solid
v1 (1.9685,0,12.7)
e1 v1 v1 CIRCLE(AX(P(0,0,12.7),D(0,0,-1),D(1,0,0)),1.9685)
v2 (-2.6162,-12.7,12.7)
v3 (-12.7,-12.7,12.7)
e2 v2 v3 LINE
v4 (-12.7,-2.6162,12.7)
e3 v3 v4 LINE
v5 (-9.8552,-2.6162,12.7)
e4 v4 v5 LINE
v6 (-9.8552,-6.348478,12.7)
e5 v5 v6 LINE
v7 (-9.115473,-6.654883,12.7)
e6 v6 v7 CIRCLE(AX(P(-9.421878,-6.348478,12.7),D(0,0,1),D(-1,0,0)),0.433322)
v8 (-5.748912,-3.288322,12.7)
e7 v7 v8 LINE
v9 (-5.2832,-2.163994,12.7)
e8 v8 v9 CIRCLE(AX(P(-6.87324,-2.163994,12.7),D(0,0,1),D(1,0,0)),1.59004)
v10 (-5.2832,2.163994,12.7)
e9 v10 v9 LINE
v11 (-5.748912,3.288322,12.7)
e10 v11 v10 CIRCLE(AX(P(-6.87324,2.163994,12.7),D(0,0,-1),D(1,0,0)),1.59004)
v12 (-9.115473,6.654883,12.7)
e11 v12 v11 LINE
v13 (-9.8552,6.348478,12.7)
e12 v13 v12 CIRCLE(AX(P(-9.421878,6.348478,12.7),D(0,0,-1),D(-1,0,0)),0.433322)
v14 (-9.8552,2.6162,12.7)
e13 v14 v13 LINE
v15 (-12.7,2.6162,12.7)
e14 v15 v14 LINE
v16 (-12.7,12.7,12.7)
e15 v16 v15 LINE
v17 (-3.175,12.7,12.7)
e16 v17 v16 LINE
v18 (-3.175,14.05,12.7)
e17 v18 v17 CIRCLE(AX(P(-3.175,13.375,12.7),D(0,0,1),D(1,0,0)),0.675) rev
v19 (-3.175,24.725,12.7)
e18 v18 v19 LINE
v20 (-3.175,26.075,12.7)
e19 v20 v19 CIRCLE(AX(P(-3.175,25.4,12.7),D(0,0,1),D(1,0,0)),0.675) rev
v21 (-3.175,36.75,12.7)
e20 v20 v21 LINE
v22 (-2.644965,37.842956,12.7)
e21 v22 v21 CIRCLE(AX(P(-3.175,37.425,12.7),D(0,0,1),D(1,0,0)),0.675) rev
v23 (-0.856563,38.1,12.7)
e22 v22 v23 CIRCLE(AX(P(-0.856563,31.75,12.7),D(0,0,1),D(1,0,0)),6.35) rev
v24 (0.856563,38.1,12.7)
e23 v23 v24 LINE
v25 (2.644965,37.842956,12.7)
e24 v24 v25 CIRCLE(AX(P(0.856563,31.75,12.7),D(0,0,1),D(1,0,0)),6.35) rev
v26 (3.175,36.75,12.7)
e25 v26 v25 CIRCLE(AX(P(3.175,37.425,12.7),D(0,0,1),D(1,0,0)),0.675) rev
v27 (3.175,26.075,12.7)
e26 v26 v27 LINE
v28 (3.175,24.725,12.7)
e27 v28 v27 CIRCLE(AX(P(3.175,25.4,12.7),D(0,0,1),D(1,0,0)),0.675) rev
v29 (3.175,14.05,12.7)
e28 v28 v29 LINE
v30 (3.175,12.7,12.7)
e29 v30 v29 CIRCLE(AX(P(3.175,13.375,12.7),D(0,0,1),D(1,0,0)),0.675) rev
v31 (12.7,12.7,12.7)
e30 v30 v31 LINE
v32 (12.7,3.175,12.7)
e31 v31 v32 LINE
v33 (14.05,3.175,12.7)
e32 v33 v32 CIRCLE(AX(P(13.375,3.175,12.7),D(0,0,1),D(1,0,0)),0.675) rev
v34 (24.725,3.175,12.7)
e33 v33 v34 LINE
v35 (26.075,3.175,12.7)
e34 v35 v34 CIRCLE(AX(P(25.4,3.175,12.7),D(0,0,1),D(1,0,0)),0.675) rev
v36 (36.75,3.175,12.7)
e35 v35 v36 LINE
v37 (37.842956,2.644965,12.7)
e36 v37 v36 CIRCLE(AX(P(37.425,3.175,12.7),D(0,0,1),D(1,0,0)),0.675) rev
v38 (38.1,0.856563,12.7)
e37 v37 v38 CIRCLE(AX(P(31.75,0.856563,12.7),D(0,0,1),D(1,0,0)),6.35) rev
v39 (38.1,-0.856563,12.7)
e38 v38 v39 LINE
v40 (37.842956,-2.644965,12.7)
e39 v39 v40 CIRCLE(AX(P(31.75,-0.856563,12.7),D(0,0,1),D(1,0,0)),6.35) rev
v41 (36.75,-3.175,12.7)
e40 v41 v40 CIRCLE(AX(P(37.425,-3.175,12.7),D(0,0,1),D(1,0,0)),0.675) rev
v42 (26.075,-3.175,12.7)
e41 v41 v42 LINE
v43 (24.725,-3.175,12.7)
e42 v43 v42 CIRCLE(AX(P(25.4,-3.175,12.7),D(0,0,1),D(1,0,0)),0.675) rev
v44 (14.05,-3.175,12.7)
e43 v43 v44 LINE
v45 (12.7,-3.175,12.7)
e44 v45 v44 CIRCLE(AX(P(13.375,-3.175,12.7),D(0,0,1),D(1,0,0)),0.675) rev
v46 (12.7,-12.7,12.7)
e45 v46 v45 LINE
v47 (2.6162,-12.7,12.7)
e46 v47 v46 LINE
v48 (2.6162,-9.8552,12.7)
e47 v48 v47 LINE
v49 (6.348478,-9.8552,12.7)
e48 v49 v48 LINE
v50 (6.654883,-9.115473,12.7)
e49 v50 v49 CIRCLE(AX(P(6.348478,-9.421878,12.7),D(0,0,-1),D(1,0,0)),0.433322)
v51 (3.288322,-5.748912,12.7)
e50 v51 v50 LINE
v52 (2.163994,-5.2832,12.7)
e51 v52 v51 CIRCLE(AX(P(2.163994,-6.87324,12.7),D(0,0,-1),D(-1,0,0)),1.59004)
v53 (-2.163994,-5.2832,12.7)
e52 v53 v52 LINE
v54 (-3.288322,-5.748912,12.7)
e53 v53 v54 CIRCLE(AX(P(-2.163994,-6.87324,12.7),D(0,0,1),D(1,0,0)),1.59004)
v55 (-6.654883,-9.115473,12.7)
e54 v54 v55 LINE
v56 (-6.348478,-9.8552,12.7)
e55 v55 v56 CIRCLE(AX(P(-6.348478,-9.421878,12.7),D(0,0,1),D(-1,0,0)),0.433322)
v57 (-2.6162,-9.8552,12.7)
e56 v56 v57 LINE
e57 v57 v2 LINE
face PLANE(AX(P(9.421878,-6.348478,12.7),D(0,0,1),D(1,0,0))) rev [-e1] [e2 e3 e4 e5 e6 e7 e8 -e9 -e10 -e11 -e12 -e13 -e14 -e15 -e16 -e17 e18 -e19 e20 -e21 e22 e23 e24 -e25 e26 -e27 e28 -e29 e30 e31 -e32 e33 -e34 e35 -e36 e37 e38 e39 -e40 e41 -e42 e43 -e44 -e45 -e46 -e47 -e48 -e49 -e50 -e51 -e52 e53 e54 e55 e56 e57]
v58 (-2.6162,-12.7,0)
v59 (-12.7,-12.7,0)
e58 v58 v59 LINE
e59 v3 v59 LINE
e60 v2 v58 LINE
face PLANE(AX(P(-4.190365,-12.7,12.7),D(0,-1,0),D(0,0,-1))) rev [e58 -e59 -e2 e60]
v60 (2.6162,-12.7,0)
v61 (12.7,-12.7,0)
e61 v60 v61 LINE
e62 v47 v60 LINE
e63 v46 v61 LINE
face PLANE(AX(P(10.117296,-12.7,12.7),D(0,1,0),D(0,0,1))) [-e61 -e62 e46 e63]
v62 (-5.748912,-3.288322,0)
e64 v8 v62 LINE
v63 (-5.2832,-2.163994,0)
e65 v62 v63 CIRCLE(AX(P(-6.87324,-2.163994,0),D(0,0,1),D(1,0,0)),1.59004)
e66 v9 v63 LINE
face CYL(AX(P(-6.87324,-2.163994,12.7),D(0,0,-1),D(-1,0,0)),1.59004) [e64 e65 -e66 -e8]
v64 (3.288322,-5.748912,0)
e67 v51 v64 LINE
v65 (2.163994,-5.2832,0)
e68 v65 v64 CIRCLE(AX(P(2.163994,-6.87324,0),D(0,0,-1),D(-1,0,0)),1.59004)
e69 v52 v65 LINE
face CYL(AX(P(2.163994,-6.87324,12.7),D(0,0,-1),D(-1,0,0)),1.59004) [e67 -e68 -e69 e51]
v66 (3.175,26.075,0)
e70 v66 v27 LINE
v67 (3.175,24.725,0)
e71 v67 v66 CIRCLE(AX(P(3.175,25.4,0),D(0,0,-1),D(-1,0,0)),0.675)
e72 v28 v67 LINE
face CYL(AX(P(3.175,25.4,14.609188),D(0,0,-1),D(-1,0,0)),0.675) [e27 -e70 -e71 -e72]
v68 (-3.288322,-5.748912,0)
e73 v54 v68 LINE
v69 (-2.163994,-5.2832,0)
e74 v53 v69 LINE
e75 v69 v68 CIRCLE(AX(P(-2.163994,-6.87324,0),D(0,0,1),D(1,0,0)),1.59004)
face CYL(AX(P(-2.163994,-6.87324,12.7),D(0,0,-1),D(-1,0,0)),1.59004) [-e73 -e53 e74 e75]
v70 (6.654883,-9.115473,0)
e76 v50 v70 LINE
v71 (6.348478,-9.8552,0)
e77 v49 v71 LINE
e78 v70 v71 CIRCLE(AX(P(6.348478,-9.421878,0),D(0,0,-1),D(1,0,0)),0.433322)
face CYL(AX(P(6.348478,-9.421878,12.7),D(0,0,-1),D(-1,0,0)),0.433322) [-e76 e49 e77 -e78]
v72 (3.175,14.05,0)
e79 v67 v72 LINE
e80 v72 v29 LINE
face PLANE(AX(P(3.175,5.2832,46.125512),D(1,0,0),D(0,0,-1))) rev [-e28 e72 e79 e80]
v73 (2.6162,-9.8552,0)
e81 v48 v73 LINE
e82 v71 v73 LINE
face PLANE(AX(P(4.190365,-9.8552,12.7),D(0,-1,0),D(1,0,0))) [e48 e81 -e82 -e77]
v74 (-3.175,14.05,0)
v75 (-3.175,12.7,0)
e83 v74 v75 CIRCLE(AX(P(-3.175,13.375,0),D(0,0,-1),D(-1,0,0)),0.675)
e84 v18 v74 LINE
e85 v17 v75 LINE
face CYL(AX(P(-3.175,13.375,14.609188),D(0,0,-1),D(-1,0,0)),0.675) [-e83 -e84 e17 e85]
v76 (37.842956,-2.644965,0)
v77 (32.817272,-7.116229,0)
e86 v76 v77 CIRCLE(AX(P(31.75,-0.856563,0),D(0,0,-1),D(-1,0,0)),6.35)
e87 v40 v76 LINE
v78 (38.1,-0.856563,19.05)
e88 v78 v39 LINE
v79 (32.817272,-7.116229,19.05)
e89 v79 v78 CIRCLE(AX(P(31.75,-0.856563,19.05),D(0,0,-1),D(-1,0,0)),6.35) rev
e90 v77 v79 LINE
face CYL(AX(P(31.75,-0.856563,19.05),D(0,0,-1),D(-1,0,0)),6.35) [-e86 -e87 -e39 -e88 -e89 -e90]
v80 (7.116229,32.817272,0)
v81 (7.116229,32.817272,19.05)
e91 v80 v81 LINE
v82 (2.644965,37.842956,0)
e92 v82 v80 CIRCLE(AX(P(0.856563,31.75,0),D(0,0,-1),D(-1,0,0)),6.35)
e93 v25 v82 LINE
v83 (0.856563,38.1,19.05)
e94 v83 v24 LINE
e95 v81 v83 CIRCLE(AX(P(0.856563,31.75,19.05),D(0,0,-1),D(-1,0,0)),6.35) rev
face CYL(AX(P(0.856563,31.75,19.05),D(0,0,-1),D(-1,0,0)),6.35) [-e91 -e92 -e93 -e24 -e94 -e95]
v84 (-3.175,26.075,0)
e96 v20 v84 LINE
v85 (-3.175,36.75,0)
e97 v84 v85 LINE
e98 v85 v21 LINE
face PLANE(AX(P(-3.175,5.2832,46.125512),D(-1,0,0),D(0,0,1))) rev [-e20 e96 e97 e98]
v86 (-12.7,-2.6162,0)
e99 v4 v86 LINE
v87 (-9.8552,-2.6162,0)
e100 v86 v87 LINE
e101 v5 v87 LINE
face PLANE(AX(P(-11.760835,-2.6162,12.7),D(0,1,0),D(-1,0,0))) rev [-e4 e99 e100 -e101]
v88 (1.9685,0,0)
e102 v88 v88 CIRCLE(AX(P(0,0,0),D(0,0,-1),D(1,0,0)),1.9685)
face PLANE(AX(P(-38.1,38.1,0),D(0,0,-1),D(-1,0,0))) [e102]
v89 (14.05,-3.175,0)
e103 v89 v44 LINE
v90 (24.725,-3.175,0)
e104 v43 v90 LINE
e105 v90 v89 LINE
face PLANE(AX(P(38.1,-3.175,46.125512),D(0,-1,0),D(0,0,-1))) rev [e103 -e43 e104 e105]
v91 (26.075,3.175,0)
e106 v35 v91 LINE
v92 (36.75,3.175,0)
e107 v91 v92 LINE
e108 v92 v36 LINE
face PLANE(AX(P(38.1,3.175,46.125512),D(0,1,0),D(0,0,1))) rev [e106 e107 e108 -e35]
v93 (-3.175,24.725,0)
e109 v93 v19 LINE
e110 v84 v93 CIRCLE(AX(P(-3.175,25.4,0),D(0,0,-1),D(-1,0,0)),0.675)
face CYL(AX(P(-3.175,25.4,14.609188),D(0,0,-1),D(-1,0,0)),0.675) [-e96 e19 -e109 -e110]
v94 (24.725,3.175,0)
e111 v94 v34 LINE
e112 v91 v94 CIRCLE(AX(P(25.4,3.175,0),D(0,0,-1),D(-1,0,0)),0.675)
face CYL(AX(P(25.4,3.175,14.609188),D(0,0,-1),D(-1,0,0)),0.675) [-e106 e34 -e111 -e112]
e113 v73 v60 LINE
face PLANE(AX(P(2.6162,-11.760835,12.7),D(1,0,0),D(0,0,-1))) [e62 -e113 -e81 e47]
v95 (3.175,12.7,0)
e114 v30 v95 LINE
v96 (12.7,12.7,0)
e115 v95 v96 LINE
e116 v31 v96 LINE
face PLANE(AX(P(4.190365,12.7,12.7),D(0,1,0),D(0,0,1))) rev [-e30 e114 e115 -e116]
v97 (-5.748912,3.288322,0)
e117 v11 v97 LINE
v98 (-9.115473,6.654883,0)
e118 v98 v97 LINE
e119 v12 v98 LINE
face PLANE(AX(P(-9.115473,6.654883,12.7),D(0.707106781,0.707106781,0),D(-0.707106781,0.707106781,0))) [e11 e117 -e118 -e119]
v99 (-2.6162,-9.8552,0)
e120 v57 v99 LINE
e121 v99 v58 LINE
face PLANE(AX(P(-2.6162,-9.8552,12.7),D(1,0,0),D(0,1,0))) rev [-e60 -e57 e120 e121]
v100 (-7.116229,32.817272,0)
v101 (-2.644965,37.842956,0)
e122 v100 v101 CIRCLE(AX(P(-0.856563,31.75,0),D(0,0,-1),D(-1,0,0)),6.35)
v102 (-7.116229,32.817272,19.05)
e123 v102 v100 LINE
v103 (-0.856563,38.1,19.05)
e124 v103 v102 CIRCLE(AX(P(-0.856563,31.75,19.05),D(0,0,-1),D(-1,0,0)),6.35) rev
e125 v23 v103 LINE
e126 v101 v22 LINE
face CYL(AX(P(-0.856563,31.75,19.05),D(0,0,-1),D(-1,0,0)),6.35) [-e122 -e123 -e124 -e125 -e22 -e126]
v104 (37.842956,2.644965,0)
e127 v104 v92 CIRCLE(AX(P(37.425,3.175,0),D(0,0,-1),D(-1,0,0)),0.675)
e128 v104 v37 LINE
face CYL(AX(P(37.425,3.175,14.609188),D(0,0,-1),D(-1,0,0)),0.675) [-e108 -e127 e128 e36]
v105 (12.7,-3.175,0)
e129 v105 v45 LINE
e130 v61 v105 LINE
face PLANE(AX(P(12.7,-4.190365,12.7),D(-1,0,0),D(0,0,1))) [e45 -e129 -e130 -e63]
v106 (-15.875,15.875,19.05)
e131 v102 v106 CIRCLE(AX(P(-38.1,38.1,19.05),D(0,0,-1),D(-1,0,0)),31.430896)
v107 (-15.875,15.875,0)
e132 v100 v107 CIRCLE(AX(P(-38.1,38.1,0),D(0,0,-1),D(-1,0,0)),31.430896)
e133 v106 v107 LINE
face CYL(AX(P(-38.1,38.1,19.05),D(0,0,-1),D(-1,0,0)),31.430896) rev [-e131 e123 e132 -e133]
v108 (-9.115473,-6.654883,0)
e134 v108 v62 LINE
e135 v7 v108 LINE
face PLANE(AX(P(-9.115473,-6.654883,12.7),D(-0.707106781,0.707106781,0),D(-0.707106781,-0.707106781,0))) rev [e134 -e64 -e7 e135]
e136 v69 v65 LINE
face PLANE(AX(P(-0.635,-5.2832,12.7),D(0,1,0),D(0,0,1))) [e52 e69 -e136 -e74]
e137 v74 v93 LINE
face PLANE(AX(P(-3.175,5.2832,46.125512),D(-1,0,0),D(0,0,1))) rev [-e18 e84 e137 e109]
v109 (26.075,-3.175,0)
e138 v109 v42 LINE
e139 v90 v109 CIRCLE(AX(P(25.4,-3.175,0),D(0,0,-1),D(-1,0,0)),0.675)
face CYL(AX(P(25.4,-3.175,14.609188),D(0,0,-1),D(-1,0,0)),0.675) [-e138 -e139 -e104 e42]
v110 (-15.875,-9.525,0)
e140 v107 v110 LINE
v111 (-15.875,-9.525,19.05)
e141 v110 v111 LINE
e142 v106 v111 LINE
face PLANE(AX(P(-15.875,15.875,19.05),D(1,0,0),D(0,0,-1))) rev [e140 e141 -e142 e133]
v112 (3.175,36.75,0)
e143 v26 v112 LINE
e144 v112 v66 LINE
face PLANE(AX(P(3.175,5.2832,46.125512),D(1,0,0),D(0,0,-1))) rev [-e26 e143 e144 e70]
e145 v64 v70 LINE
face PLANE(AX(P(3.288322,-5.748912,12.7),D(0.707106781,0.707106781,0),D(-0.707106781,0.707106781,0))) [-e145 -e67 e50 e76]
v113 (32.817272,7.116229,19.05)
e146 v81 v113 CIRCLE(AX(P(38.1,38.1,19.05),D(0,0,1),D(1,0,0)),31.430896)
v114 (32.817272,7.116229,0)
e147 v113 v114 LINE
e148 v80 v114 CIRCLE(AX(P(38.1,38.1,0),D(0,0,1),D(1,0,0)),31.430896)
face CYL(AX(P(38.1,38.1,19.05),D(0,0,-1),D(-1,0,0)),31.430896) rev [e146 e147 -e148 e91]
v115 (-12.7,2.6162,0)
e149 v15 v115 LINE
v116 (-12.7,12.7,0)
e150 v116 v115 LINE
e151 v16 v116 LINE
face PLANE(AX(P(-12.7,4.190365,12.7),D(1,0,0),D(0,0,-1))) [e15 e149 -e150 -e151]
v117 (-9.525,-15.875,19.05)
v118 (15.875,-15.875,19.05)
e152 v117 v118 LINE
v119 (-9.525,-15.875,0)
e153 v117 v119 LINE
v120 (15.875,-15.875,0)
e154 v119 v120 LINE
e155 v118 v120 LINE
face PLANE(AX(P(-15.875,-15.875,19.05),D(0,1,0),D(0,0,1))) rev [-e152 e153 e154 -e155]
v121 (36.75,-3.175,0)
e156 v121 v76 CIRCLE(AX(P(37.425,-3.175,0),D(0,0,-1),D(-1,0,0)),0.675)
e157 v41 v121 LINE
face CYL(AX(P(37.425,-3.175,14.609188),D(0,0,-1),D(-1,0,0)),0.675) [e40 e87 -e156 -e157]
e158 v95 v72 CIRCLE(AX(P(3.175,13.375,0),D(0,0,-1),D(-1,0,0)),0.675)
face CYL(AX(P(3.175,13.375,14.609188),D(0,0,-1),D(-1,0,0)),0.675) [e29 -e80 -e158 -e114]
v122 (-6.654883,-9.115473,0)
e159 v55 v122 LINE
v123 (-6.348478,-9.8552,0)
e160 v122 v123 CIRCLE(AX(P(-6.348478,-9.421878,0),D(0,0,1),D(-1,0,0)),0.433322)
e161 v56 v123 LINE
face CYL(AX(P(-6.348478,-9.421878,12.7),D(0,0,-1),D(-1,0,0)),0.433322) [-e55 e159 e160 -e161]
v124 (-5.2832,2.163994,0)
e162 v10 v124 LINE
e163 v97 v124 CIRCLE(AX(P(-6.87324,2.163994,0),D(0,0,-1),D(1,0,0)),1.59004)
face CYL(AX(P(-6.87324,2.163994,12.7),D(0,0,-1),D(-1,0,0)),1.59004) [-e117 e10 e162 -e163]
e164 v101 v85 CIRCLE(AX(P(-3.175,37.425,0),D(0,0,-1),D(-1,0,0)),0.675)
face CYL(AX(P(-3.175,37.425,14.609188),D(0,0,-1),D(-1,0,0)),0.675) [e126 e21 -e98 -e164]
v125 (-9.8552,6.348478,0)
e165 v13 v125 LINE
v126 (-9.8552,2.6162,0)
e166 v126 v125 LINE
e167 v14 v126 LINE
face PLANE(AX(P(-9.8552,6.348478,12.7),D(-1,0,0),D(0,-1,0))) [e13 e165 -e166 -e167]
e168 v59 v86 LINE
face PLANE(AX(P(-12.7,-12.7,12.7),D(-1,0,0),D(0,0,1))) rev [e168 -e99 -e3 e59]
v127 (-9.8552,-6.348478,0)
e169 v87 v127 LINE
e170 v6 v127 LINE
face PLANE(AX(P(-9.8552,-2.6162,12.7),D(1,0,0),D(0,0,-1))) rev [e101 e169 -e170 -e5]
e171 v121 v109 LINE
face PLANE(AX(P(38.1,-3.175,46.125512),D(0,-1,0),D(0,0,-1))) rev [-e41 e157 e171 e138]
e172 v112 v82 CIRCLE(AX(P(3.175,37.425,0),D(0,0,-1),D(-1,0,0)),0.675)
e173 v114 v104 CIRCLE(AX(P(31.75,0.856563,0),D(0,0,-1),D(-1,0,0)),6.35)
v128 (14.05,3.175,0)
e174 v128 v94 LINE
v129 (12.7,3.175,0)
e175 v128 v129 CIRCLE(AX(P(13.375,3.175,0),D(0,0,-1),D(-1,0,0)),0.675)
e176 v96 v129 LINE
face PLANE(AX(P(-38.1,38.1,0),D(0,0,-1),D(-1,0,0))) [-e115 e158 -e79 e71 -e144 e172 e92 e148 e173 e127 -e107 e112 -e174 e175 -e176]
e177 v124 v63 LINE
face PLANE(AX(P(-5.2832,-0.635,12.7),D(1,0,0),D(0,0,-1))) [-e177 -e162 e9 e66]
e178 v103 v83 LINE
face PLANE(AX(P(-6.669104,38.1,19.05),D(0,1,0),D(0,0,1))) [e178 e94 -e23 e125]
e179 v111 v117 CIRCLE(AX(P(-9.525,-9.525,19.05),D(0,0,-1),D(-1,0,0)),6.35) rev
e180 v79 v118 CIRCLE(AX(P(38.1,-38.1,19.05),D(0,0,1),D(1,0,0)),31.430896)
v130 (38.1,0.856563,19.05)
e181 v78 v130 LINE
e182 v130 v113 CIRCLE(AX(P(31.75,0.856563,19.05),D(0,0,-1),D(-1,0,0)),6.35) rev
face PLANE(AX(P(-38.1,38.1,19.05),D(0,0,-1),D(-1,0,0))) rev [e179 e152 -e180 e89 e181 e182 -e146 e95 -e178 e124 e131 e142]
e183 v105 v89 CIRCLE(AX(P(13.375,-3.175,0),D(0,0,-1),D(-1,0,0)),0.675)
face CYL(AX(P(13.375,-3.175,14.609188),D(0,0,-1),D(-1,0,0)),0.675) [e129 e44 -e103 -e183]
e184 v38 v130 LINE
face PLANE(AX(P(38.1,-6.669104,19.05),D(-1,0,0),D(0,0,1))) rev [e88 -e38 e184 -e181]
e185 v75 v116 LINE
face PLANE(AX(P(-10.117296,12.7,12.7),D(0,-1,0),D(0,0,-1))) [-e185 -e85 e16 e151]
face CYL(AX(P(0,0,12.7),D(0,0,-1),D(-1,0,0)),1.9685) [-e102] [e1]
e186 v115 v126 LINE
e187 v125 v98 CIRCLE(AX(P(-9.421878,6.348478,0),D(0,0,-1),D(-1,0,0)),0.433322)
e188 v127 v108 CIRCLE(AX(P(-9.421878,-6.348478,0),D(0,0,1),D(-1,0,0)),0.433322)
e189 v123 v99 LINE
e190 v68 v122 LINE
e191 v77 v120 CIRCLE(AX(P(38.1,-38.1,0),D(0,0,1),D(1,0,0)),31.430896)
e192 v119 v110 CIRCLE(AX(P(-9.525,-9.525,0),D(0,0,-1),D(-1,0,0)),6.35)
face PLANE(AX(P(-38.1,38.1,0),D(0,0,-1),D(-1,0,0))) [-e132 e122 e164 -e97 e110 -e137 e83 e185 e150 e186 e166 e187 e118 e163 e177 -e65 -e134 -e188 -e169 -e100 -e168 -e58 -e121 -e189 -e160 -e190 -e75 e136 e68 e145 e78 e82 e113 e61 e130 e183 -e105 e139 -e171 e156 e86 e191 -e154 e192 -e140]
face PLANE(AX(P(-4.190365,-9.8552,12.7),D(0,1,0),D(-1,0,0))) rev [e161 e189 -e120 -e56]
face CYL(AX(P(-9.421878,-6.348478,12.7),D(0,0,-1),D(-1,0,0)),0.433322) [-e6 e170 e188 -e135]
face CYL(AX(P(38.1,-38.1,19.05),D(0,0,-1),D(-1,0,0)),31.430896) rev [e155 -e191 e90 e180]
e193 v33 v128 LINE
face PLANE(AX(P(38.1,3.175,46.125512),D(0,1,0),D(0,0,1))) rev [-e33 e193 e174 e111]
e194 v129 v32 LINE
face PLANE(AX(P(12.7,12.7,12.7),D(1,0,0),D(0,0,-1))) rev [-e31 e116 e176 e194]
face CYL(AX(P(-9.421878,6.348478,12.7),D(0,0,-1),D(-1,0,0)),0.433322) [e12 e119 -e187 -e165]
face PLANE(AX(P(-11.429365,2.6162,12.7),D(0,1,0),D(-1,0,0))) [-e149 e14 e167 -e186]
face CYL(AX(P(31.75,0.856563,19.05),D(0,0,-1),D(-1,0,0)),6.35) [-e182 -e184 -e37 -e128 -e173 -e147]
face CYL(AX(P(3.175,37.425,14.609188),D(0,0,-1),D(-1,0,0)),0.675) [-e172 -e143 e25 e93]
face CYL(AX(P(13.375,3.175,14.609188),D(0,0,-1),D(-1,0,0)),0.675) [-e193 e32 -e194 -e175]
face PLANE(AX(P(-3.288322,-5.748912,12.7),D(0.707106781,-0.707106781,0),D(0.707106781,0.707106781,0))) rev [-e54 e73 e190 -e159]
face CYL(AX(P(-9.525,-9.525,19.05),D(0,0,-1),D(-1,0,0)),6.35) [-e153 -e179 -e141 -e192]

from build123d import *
from build123d.topology import SkipClean

# Parameters (mm, degrees)
BOSS_EXTRUDE1_DEPTH  = 19.05
CUT_EXTRUDE1_DEPTH   = 12.7
MIRROR2_COPY_1_DEPTH = 12.7
SKETCH6_W            = 6.35
SKETCH6_H            = 32.8168
SKETCH6_W_2          = 32.8168
SKETCH6_H_2          = 6.35
CUT_EXTRUDE2_DEPTH   = 12.7
SKETCH7_R            = 0.675
BOSS_EXTRUDE2_DEPTH  = 12.7
FILLET2_DEPTH        = 20
CUT_EXTRUDE3_DEPTH   = 12.7


with BuildPart() as part:
    # Sketch5 → Boss-Extrude1 (new body)
    with BuildSketch(Plane.XY):
        with BuildLine():
            Line((-15.875, 15.875), (-15.875, -15.875))
            Line((-15.875, -15.875), (15.875, -15.875))
            ThreePointArc((15.875, -15.875), (26.071916674, -9.061638106), (38.1, -6.669103576))
            Line((38.1, -6.669103576), (38.1, 6.669103576))
            ThreePointArc((38.1, 6.669103576), (15.875, 15.875), (6.669103576, 38.1))
            Line((6.669103576, 38.1), (-6.669103576, 38.1))
            ThreePointArc((-6.669103576, 38.1), (-9.061638106, 26.071916674), (-15.875, 15.875))
        make_face()
    extrude(amount=BOSS_EXTRUDE1_DEPTH)

    # Sketch4 → Cut-Extrude1 (cut)
    with BuildSketch(Plane.XY):
        with BuildLine():
            Line((4.190365, -12.7), (10.11729625, -12.7))
            Line((10.11729625, -12.7), (12.7, -12.7))
            Line((12.7, -12.7), (12.7, -10.11729625))
            Line((12.7, -10.11729625), (12.7, -4.190365))
            Line((12.7, -4.190365), (12.7, -2.6162))
            Line((12.7, -2.6162), (11.760835, -2.6162))
            Line((11.760835, -2.6162), (11.429365, -2.6162))
            Line((11.429365, -2.6162), (9.8552, -2.6162))
            Line((9.8552, -2.6162), (9.8552, -4.190365))
            Line((9.8552, -4.190365), (9.8552, -6.348478019))
            ThreePointArc((9.8552, -6.348478019), (9.587703162, -6.748815328), (9.115473107, -6.65488293))
            Line((9.115473107, -6.65488293), (5.748911934, -3.288321756))
            ThreePointArc((5.748911934, -3.288321756), (5.404234588, -2.772475655), (5.2832, -2.16399369))
            Line((5.2832, -2.16399369), (5.2832, 0.635))
            Line((5.2832, 0.635), (1.863267895, 0.635))
            ThreePointArc((1.863267895, 0.635), (1.391939699, -1.391939699), (-0.635, -1.863267895))
            Line((-0.635, -1.863267895), (-0.635, -5.2832))
            Line((-0.635, -5.2832), (2.16399369, -5.2832))
            ThreePointArc((2.16399369, -5.2832), (2.772475655, -5.404234588), (3.288321756, -5.748911934))
            Line((3.288321756, -5.748911934), (6.65488293, -9.115473107))
            ThreePointArc((6.65488293, -9.115473107), (6.748815328, -9.587703162), (6.348478019, -9.8552))
            Line((6.348478019, -9.8552), (4.190365, -9.8552))
            Line((4.190365, -9.8552), (2.6162, -9.8552))
            Line((2.6162, -9.8552), (2.6162, -11.429365))
            Line((2.6162, -11.429365), (2.6162, -11.760835))
            Line((2.6162, -11.760835), (2.6162, -12.7))
            Line((2.6162, -12.7), (4.190365, -12.7))
        make_face()
    cut_extrude1 = extrude(amount=CUT_EXTRUDE1_DEPTH, mode=Mode.SUBTRACT)

    # Mirror1: Cut-Extrude1 across plane
    add(cut_extrude1.mirror(Plane.ZX), mode=Mode.SUBTRACT)

    # Mirror2: Cut-Extrude1 across plane
    add(cut_extrude1.mirror(Plane(origin=(0, 0, 0), x_dir=(0, 0, 1), z_dir=(1, 0, 0))), mode=Mode.SUBTRACT)

    # Mirror2 copy 1 sketch → Mirror2 copy 1 (cut)
    with BuildSketch(Plane(origin=(0, 0, 0), x_dir=(-1, 0, 0), z_dir=(0, 0, 1))):
        with BuildLine():
            Line((4.190365, -12.7), (10.11729625, -12.7))
            Line((10.11729625, -12.7), (12.7, -12.7))
            Line((12.7, -12.7), (12.7, -10.11729625))
            Line((12.7, -10.11729625), (12.7, -4.190365))
            Line((12.7, -4.190365), (12.7, -2.6162))
            Line((12.7, -2.6162), (11.760835, -2.6162))
            Line((11.760835, -2.6162), (11.429365, -2.6162))
            Line((11.429365, -2.6162), (9.8552, -2.6162))
            Line((9.8552, -2.6162), (9.8552, -4.190365))
            Line((9.8552, -4.190365), (9.8552, -6.348478019))
            ThreePointArc((9.8552, -6.348478019), (9.587703162, -6.748815328), (9.115473107, -6.65488293))
            Line((9.115473107, -6.65488293), (5.748911934, -3.288321756))
            ThreePointArc((5.748911934, -3.288321756), (5.404234588, -2.772475655), (5.2832, -2.16399369))
            Line((5.2832, -2.16399369), (5.2832, 0.635))
            Line((5.2832, 0.635), (1.863267895, 0.635))
            ThreePointArc((1.863267895, 0.635), (1.391939699, -1.391939699), (-0.635, -1.863267895))
            Line((-0.635, -1.863267895), (-0.635, -5.2832))
            Line((-0.635, -5.2832), (2.16399369, -5.2832))
            ThreePointArc((2.16399369, -5.2832), (2.772475655, -5.404234588), (3.288321756, -5.748911934))
            Line((3.288321756, -5.748911934), (6.65488293, -9.115473107))
            ThreePointArc((6.65488293, -9.115473107), (6.748815328, -9.587703162), (6.348478019, -9.8552))
            Line((6.348478019, -9.8552), (4.190365, -9.8552))
            Line((4.190365, -9.8552), (2.6162, -9.8552))
            Line((2.6162, -9.8552), (2.6162, -11.429365))
            Line((2.6162, -11.429365), (2.6162, -11.760835))
            Line((2.6162, -11.760835), (2.6162, -12.7))
            Line((2.6162, -12.7), (4.190365, -12.7))
        make_face()
    extrude(amount=MIRROR2_COPY_1_DEPTH, mode=Mode.SUBTRACT)

    # Sketch6 → Cut-Extrude2 (cut)
    with BuildSketch(Plane(origin=(0, 0, 0), x_dir=(-1, 0, 0), z_dir=(0, 0, -1))):
        with Locations((0, 21.6916)):
            Rectangle(SKETCH6_W, SKETCH6_H)
        with Locations((-21.6916, 0)):
            Rectangle(SKETCH6_W_2, SKETCH6_H_2)
    extrude(amount=-CUT_EXTRUDE2_DEPTH, mode=Mode.SUBTRACT)

    # Sketch7 → Boss-Extrude2 (add)
    with SkipClean():  # the faces are left unmerged after this step: merging them gives an invalid solid
        with BuildSketch(Plane(origin=(0, 0, 0), x_dir=(-1, 0, 0), z_dir=(0, 0, -1))):
            with Locations((-37.425, 3.175)):
                Circle(SKETCH7_R)
            with Locations((-13.375, 3.175)):
                Circle(SKETCH7_R)
            with Locations((-13.375, -3.175)):
                Circle(SKETCH7_R)
            with Locations((-37.425, -3.175)):
                Circle(SKETCH7_R)
            with Locations((-3.175, 13.375)):
                Circle(SKETCH7_R)
            with Locations((3.175, 13.375)):
                Circle(SKETCH7_R)
            with Locations((-3.175, 37.425)):
                Circle(SKETCH7_R)
            with Locations((3.175, 37.425)):
                Circle(SKETCH7_R)
            with Locations((-25.4, 3.175)):
                Circle(SKETCH7_R)
            with Locations((-25.4, -3.175)):
                Circle(SKETCH7_R)
            with Locations((-3.175, 25.4)):
                Circle(SKETCH7_R)
            with Locations((3.175, 25.4)):
                Circle(SKETCH7_R)
        extrude(amount=-BOSS_EXTRUDE2_DEPTH)

    # Fillet2: read off the stored shape, not the designer's step
    # Fillet2 outline → Fillet2 (cut)
    with SkipClean():  # the faces are left unmerged after this step: merging them gives an invalid solid
        with BuildSketch(Plane.XY):
            with BuildLine():
                Line((-15.875, -15.875), (-9.525, -15.875))
                ThreePointArc((-9.525, -15.875), (-14.015128061, -14.015128061), (-15.875, -9.525))
                Line((-15.875, -9.525), (-15.875, -15.875))
            make_face()
            with BuildLine():
                ThreePointArc((32.817272188, -7.11622946), (35.449191883, -6.781084528), (38.1, -6.669103576))
                Line((38.1, -6.669103576), (38.1, -0.85656253))
                ThreePointArc((38.1, -0.85656253), (36.602817656, -4.952006438), (32.817272188, -7.11622946))
            make_face()
            with BuildLine():
                ThreePointArc((-6.669103576, 38.1), (-6.781084528, 35.449191883), (-7.11622946, 32.817272188))
                ThreePointArc((-7.11622946, 32.817272188), (-4.952006438, 36.602817656), (-0.85656253, 38.1))
                Line((-0.85656253, 38.1), (-6.669103576, 38.1))
            make_face()
            with BuildLine():
                Line((38.1, 0.85656253), (38.1, 6.669103576))
                ThreePointArc((38.1, 6.669103576), (35.449191883, 6.781084528), (32.817272188, 7.11622946))
                ThreePointArc((32.817272188, 7.11622946), (36.602817656, 4.952006438), (38.1, 0.85656253))
            make_face()
            with BuildLine():
                ThreePointArc((0.85656253, 38.1), (4.952006438, 36.602817656), (7.11622946, 32.817272188))
                ThreePointArc((7.11622946, 32.817272188), (6.781084528, 35.449191883), (6.669103576, 38.1))
                Line((6.669103576, 38.1), (0.85656253, 38.1))
            make_face()
        extrude(amount=FILLET2_DEPTH, mode=Mode.SUBTRACT)

    # Sketch8 → Cut-Extrude3 (cut)
    with SkipClean():  # the faces are left unmerged after this step: merging them gives an invalid solid
        with BuildSketch(Plane(origin=(0, 0, 0), x_dir=(-1, 0, 0), z_dir=(0, 0, -1))):
            Polygon((-11.115734746, 10.664446616), (-11.115734746, -10.290263943), (-3.470097109, -3.989692187), (-3.470097109, 3.514359567), (3.609196999, 3.514359567), (10.051354637, 10.664446616), align=None)
        extrude(amount=-CUT_EXTRUDE3_DEPTH, mode=Mode.SUBTRACT)


solid = part.part
